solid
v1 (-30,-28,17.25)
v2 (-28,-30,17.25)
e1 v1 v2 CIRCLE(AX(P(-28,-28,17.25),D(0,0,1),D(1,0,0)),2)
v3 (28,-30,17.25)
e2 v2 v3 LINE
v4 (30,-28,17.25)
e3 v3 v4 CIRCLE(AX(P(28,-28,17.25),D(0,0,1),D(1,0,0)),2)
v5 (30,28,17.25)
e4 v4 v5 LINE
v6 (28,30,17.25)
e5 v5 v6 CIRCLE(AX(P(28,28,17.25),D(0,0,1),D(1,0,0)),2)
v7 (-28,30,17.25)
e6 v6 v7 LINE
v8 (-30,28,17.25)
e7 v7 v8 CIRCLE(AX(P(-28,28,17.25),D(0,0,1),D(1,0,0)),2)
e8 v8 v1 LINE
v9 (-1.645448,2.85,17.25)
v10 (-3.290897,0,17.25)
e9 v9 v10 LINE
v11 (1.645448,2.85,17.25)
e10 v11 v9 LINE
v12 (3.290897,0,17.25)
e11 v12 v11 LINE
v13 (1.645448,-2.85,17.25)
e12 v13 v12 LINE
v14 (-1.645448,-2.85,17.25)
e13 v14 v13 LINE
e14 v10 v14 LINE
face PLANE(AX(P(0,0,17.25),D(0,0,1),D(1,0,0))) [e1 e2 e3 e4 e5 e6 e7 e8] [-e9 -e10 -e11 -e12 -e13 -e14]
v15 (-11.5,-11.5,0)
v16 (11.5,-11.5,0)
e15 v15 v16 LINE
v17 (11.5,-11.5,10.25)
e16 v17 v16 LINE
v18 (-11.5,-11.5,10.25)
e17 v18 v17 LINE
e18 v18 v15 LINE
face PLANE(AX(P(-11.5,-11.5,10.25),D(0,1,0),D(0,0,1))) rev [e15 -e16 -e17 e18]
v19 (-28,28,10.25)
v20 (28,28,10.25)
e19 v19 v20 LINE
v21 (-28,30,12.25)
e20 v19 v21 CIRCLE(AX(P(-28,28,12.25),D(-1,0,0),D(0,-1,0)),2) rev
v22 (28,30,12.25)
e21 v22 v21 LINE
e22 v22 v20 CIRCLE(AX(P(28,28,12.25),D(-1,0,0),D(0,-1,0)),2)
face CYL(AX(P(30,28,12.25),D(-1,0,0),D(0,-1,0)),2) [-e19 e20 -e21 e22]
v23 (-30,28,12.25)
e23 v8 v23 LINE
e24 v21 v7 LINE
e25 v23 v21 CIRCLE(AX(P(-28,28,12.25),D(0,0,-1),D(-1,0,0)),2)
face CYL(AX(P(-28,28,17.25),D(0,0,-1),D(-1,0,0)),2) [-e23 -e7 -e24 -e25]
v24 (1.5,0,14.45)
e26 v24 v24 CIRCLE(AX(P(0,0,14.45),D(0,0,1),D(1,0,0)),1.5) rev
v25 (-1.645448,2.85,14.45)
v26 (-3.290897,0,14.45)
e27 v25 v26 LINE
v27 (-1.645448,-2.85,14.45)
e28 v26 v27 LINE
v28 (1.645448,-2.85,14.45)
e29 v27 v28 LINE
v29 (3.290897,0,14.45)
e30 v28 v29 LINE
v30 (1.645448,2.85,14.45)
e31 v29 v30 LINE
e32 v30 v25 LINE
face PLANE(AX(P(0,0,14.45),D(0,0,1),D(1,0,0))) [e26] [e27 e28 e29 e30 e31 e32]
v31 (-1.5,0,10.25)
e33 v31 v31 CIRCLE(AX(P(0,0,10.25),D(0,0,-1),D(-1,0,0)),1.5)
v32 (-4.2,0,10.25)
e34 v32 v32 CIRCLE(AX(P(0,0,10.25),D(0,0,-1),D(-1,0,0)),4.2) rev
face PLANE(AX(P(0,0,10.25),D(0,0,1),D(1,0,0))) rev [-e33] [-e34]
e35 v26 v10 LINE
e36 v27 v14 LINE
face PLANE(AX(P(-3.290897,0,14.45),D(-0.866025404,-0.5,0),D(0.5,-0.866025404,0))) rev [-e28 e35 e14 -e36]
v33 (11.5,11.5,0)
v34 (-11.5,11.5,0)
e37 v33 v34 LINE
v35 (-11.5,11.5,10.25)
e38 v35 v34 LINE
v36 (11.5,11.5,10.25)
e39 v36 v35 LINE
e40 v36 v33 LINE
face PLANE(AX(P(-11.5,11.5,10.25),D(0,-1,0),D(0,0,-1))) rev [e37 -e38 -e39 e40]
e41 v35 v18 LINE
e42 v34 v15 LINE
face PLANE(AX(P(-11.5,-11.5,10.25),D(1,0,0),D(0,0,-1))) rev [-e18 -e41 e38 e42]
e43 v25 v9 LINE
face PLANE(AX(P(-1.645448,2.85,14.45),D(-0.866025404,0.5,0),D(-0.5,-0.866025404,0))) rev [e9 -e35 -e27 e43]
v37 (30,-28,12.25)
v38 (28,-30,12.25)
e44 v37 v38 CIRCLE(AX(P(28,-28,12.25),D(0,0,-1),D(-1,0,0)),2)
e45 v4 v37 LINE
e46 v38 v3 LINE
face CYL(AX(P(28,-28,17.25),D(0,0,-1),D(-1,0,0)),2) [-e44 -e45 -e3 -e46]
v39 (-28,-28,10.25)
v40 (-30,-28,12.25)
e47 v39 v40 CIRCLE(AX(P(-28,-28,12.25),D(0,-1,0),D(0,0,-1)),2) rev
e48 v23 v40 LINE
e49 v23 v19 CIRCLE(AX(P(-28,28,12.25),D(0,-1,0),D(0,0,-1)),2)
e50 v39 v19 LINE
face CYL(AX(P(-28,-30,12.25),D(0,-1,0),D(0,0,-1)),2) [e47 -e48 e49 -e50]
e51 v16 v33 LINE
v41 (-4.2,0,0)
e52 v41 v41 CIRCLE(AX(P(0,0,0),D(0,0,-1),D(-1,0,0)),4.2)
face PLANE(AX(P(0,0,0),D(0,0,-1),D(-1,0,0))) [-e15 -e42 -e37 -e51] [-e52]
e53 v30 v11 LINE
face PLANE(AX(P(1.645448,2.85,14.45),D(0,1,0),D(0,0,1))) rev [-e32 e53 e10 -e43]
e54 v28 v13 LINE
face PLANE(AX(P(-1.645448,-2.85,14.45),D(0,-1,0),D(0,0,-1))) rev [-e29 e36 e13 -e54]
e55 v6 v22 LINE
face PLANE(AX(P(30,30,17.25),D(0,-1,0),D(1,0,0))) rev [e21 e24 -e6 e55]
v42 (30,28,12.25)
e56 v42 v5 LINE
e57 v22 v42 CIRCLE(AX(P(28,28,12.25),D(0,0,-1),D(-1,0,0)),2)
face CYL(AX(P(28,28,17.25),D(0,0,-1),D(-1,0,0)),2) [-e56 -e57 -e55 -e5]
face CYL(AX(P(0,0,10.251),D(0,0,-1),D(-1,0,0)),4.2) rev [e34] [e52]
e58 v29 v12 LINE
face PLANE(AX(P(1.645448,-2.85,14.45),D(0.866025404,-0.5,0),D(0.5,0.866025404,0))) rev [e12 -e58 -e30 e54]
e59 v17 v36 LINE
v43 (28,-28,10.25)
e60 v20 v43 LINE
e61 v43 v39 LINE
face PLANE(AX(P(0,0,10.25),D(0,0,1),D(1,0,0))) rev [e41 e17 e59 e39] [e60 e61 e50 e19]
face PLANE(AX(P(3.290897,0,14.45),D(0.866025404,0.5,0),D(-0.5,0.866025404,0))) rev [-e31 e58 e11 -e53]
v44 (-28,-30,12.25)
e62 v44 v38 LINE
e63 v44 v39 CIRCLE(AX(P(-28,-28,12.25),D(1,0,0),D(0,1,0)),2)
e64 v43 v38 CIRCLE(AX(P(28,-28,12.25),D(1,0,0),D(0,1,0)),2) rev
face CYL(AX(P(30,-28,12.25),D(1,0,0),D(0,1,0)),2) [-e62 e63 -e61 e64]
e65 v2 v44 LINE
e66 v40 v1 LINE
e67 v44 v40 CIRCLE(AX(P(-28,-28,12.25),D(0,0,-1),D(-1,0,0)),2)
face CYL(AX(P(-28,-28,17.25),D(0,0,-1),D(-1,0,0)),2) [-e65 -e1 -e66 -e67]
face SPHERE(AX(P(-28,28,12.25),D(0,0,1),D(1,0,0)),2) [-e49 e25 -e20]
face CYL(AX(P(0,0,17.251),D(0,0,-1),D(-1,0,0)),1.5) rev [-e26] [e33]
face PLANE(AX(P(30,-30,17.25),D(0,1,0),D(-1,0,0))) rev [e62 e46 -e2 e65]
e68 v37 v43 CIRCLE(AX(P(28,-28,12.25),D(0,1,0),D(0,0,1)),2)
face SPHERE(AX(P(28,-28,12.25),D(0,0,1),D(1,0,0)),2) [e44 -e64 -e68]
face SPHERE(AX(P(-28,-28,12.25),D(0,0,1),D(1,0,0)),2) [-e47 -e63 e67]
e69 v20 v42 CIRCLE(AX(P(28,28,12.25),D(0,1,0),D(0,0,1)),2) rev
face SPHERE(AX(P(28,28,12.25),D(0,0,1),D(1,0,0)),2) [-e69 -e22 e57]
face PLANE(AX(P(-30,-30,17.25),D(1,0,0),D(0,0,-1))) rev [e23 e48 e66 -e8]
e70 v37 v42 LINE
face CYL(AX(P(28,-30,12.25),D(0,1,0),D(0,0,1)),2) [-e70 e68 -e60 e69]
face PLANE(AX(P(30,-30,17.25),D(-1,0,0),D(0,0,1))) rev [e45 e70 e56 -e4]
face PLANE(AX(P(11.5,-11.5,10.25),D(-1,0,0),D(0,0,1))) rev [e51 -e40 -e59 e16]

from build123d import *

# Parameters (mm, degrees)
ESBO_O1_W                = 23
ESBO_O1_H                = 23
RESSALTO_EXTRUS_O1_DEPTH = 10.25
CORTE_EXTRUS_O1_REACH    = 21.224
ESBO_O2_R                = 4.2
ESBO_O3_W                = 60
ESBO_O3_H                = 60
RESSALTO_EXTRUS_O2_DEPTH = 7
CORTE_EXTRUS_O2_REACH    = 45.647
ESBO_O4_R                = 1.5
CORTE_EXTRUS_O3_DEPTH    = 2.8
FILETE1_R                = 2
FILETE2_R                = 2


with BuildPart() as part:
    # Esboço1 → Ressalto-extrusão1 (new body)
    with BuildSketch(Plane.XY):
        Rectangle(ESBO_O1_W, ESBO_O1_H)
    extrude(amount=RESSALTO_EXTRUS_O1_DEPTH)

    # Esboço2 → Corte-extrusão1 (cut, up to next)
    with BuildSketch(Plane(origin=(0, 0, 0), x_dir=(-1, 0, 0), z_dir=(0, 0, -1)), mode=Mode.PRIVATE) as corte_extrus_o1_sk1:
        Circle(ESBO_O2_R)
    corte_extrus_o1_tool1 = extrude(corte_extrus_o1_sk1.sketch, amount=-CORTE_EXTRUS_O1_REACH, mode=Mode.PRIVATE) & part.part
    add(corte_extrus_o1_tool1.solids().sort_by_distance((0, 0, 0))[0], mode=Mode.SUBTRACT)

    # Esboço3 → Ressalto-extrusão2 (add)
    with BuildSketch(Plane.XY.offset(10.25)):
        Rectangle(ESBO_O3_W, ESBO_O3_H)
    extrude(amount=RESSALTO_EXTRUS_O2_DEPTH)

    # Esboço4 → Corte-extrusão2 (cut, up to next)
    with BuildSketch(Plane(origin=(0, 0, 10.25), x_dir=(-1, 0, 0), z_dir=(0, 0, -1)), mode=Mode.PRIVATE) as corte_extrus_o2_sk1:
        Circle(ESBO_O4_R)
    corte_extrus_o2_tool1 = extrude(corte_extrus_o2_sk1.sketch, amount=-CORTE_EXTRUS_O2_REACH, mode=Mode.PRIVATE) & part.part
    add(corte_extrus_o2_tool1.solids().sort_by_distance((0, 0, 10.25))[0], mode=Mode.SUBTRACT)

    # Esboço5 → Corte-extrusão3 (cut)
    with BuildSketch(Plane.XY.offset(17.25)):
        Polygon((3.290896534, 0), (1.645448267, 2.85), (-1.645448267, 2.85), (-3.290896534, 0), (-1.645448267, -2.85), (1.645448267, -2.85), align=None)
    extrude(amount=-CORTE_EXTRUS_O3_DEPTH, mode=Mode.SUBTRACT)

    # Filete1
    filete1_edges = [part.edges().sort_by_distance(p)[0] for p in [
        (-30, 0, 10.25),
        (0, -30, 10.25),
        (30, 0, 10.25),
        (0, 30, 10.25),
    ]]
    fillet(filete1_edges, radius=FILETE1_R)

    # Filete2
    # the kernel refuses this fillet: 2 mm, written as the material it takes off along each edge
    with BuildSketch(Plane(origin=(-28, -28, 12.25), x_dir=(-1, 0, 0), z_dir=(0, -1, 0))) as filete2_piece_1_section:
        Polygon((0, 0), (FILETE2_R, 0), (FILETE2_R, FILETE2_R), (0, FILETE2_R), align=None)
    filete2_piece_1 = extrude(amount=FILETE2_R, mode=Mode.PRIVATE)
    filete2_piece_1 = filete2_piece_1 - Plane(origin=(-28, -28, 12.25), x_dir=(0.7071067811865475, 0, 0.7071067811865475), z_dir=(0, -1, 0)) * Sphere(FILETE2_R, mode=Mode.PRIVATE)
    add(filete2_piece_1, mode=Mode.SUBTRACT)
    with BuildSketch(Plane(origin=(-28, 28, 12.25), x_dir=(0, 1, 0), z_dir=(-1, 0, 0))) as filete2_piece_2_section:
        Polygon((0, 0), (FILETE2_R, 0), (FILETE2_R, FILETE2_R), (0, FILETE2_R), align=None)
    filete2_piece_2 = extrude(amount=FILETE2_R, mode=Mode.PRIVATE)
    filete2_piece_2 = filete2_piece_2 - Plane(origin=(-28, 28, 12.25), x_dir=(0, -0.7071067811865475, 0.7071067811865475), z_dir=(-1, 0, 0)) * Sphere(FILETE2_R, mode=Mode.PRIVATE)
    add(filete2_piece_2, mode=Mode.SUBTRACT)
    with BuildSketch(Plane(origin=(28, -28, 12.25), x_dir=(1, 0, 0), z_dir=(0, -1, 0))) as filete2_piece_3_section:
        Polygon((0, 0), (FILETE2_R, 0), (FILETE2_R, -FILETE2_R), (0, -FILETE2_R), align=None)
    filete2_piece_3 = extrude(amount=FILETE2_R, mode=Mode.PRIVATE)
    filete2_piece_3 = filete2_piece_3 - Plane(origin=(28, -28, 12.25), x_dir=(-0.7071067811865475, 0, 0.7071067811865475), z_dir=(0, -1, 0)) * Sphere(FILETE2_R, mode=Mode.PRIVATE)
    add(filete2_piece_3, mode=Mode.SUBTRACT)
    with BuildSketch(Plane(origin=(28, 28, 12.25), x_dir=(0, 1, 0), z_dir=(1, 0, 0))) as filete2_piece_4_section:
        Polygon((0, 0), (FILETE2_R, 0), (FILETE2_R, -FILETE2_R), (0, -FILETE2_R), align=None)
    filete2_piece_4 = extrude(amount=FILETE2_R, mode=Mode.PRIVATE)
    filete2_piece_4 = filete2_piece_4 - Plane(origin=(28, 28, 12.25), x_dir=(0, -0.7071067811865475, 0.7071067811865475), z_dir=(1, 0, 0)) * Sphere(FILETE2_R, mode=Mode.PRIVATE)
    add(filete2_piece_4, mode=Mode.SUBTRACT)
    with BuildSketch(Plane(origin=(-30, 30, 12.25), x_dir=(0, -1, 0), z_dir=(0, 0, 1)), Plane(origin=(-30, -30, 12.25), x_dir=(1, 0, 0), z_dir=(0, 0, 1))) as filete2_piece_5:
        with BuildLine():
            CenterArc((FILETE2_R, FILETE2_R), FILETE2_R, 180, 90)
            Line((0, FILETE2_R), (0, 0))
            Line((0, 0), (FILETE2_R, 0))
        make_face()
    extrude(amount=10, mode=Mode.SUBTRACT)
    with BuildSketch(Plane(origin=(30, -30, 12.25), x_dir=(-1, 0, 0), z_dir=(0, 0, 1)), Plane(origin=(30, 30, 12.25), x_dir=(0, -1, 0), z_dir=(0, 0, 1))) as filete2_piece_6:
        with BuildLine():
            CenterArc((FILETE2_R, -FILETE2_R), FILETE2_R, 90, 90)
            Line((0, -FILETE2_R), (0, 0))
            Line((0, 0), (FILETE2_R, 0))
        make_face()
    extrude(amount=10, mode=Mode.SUBTRACT)


solid = part.part
